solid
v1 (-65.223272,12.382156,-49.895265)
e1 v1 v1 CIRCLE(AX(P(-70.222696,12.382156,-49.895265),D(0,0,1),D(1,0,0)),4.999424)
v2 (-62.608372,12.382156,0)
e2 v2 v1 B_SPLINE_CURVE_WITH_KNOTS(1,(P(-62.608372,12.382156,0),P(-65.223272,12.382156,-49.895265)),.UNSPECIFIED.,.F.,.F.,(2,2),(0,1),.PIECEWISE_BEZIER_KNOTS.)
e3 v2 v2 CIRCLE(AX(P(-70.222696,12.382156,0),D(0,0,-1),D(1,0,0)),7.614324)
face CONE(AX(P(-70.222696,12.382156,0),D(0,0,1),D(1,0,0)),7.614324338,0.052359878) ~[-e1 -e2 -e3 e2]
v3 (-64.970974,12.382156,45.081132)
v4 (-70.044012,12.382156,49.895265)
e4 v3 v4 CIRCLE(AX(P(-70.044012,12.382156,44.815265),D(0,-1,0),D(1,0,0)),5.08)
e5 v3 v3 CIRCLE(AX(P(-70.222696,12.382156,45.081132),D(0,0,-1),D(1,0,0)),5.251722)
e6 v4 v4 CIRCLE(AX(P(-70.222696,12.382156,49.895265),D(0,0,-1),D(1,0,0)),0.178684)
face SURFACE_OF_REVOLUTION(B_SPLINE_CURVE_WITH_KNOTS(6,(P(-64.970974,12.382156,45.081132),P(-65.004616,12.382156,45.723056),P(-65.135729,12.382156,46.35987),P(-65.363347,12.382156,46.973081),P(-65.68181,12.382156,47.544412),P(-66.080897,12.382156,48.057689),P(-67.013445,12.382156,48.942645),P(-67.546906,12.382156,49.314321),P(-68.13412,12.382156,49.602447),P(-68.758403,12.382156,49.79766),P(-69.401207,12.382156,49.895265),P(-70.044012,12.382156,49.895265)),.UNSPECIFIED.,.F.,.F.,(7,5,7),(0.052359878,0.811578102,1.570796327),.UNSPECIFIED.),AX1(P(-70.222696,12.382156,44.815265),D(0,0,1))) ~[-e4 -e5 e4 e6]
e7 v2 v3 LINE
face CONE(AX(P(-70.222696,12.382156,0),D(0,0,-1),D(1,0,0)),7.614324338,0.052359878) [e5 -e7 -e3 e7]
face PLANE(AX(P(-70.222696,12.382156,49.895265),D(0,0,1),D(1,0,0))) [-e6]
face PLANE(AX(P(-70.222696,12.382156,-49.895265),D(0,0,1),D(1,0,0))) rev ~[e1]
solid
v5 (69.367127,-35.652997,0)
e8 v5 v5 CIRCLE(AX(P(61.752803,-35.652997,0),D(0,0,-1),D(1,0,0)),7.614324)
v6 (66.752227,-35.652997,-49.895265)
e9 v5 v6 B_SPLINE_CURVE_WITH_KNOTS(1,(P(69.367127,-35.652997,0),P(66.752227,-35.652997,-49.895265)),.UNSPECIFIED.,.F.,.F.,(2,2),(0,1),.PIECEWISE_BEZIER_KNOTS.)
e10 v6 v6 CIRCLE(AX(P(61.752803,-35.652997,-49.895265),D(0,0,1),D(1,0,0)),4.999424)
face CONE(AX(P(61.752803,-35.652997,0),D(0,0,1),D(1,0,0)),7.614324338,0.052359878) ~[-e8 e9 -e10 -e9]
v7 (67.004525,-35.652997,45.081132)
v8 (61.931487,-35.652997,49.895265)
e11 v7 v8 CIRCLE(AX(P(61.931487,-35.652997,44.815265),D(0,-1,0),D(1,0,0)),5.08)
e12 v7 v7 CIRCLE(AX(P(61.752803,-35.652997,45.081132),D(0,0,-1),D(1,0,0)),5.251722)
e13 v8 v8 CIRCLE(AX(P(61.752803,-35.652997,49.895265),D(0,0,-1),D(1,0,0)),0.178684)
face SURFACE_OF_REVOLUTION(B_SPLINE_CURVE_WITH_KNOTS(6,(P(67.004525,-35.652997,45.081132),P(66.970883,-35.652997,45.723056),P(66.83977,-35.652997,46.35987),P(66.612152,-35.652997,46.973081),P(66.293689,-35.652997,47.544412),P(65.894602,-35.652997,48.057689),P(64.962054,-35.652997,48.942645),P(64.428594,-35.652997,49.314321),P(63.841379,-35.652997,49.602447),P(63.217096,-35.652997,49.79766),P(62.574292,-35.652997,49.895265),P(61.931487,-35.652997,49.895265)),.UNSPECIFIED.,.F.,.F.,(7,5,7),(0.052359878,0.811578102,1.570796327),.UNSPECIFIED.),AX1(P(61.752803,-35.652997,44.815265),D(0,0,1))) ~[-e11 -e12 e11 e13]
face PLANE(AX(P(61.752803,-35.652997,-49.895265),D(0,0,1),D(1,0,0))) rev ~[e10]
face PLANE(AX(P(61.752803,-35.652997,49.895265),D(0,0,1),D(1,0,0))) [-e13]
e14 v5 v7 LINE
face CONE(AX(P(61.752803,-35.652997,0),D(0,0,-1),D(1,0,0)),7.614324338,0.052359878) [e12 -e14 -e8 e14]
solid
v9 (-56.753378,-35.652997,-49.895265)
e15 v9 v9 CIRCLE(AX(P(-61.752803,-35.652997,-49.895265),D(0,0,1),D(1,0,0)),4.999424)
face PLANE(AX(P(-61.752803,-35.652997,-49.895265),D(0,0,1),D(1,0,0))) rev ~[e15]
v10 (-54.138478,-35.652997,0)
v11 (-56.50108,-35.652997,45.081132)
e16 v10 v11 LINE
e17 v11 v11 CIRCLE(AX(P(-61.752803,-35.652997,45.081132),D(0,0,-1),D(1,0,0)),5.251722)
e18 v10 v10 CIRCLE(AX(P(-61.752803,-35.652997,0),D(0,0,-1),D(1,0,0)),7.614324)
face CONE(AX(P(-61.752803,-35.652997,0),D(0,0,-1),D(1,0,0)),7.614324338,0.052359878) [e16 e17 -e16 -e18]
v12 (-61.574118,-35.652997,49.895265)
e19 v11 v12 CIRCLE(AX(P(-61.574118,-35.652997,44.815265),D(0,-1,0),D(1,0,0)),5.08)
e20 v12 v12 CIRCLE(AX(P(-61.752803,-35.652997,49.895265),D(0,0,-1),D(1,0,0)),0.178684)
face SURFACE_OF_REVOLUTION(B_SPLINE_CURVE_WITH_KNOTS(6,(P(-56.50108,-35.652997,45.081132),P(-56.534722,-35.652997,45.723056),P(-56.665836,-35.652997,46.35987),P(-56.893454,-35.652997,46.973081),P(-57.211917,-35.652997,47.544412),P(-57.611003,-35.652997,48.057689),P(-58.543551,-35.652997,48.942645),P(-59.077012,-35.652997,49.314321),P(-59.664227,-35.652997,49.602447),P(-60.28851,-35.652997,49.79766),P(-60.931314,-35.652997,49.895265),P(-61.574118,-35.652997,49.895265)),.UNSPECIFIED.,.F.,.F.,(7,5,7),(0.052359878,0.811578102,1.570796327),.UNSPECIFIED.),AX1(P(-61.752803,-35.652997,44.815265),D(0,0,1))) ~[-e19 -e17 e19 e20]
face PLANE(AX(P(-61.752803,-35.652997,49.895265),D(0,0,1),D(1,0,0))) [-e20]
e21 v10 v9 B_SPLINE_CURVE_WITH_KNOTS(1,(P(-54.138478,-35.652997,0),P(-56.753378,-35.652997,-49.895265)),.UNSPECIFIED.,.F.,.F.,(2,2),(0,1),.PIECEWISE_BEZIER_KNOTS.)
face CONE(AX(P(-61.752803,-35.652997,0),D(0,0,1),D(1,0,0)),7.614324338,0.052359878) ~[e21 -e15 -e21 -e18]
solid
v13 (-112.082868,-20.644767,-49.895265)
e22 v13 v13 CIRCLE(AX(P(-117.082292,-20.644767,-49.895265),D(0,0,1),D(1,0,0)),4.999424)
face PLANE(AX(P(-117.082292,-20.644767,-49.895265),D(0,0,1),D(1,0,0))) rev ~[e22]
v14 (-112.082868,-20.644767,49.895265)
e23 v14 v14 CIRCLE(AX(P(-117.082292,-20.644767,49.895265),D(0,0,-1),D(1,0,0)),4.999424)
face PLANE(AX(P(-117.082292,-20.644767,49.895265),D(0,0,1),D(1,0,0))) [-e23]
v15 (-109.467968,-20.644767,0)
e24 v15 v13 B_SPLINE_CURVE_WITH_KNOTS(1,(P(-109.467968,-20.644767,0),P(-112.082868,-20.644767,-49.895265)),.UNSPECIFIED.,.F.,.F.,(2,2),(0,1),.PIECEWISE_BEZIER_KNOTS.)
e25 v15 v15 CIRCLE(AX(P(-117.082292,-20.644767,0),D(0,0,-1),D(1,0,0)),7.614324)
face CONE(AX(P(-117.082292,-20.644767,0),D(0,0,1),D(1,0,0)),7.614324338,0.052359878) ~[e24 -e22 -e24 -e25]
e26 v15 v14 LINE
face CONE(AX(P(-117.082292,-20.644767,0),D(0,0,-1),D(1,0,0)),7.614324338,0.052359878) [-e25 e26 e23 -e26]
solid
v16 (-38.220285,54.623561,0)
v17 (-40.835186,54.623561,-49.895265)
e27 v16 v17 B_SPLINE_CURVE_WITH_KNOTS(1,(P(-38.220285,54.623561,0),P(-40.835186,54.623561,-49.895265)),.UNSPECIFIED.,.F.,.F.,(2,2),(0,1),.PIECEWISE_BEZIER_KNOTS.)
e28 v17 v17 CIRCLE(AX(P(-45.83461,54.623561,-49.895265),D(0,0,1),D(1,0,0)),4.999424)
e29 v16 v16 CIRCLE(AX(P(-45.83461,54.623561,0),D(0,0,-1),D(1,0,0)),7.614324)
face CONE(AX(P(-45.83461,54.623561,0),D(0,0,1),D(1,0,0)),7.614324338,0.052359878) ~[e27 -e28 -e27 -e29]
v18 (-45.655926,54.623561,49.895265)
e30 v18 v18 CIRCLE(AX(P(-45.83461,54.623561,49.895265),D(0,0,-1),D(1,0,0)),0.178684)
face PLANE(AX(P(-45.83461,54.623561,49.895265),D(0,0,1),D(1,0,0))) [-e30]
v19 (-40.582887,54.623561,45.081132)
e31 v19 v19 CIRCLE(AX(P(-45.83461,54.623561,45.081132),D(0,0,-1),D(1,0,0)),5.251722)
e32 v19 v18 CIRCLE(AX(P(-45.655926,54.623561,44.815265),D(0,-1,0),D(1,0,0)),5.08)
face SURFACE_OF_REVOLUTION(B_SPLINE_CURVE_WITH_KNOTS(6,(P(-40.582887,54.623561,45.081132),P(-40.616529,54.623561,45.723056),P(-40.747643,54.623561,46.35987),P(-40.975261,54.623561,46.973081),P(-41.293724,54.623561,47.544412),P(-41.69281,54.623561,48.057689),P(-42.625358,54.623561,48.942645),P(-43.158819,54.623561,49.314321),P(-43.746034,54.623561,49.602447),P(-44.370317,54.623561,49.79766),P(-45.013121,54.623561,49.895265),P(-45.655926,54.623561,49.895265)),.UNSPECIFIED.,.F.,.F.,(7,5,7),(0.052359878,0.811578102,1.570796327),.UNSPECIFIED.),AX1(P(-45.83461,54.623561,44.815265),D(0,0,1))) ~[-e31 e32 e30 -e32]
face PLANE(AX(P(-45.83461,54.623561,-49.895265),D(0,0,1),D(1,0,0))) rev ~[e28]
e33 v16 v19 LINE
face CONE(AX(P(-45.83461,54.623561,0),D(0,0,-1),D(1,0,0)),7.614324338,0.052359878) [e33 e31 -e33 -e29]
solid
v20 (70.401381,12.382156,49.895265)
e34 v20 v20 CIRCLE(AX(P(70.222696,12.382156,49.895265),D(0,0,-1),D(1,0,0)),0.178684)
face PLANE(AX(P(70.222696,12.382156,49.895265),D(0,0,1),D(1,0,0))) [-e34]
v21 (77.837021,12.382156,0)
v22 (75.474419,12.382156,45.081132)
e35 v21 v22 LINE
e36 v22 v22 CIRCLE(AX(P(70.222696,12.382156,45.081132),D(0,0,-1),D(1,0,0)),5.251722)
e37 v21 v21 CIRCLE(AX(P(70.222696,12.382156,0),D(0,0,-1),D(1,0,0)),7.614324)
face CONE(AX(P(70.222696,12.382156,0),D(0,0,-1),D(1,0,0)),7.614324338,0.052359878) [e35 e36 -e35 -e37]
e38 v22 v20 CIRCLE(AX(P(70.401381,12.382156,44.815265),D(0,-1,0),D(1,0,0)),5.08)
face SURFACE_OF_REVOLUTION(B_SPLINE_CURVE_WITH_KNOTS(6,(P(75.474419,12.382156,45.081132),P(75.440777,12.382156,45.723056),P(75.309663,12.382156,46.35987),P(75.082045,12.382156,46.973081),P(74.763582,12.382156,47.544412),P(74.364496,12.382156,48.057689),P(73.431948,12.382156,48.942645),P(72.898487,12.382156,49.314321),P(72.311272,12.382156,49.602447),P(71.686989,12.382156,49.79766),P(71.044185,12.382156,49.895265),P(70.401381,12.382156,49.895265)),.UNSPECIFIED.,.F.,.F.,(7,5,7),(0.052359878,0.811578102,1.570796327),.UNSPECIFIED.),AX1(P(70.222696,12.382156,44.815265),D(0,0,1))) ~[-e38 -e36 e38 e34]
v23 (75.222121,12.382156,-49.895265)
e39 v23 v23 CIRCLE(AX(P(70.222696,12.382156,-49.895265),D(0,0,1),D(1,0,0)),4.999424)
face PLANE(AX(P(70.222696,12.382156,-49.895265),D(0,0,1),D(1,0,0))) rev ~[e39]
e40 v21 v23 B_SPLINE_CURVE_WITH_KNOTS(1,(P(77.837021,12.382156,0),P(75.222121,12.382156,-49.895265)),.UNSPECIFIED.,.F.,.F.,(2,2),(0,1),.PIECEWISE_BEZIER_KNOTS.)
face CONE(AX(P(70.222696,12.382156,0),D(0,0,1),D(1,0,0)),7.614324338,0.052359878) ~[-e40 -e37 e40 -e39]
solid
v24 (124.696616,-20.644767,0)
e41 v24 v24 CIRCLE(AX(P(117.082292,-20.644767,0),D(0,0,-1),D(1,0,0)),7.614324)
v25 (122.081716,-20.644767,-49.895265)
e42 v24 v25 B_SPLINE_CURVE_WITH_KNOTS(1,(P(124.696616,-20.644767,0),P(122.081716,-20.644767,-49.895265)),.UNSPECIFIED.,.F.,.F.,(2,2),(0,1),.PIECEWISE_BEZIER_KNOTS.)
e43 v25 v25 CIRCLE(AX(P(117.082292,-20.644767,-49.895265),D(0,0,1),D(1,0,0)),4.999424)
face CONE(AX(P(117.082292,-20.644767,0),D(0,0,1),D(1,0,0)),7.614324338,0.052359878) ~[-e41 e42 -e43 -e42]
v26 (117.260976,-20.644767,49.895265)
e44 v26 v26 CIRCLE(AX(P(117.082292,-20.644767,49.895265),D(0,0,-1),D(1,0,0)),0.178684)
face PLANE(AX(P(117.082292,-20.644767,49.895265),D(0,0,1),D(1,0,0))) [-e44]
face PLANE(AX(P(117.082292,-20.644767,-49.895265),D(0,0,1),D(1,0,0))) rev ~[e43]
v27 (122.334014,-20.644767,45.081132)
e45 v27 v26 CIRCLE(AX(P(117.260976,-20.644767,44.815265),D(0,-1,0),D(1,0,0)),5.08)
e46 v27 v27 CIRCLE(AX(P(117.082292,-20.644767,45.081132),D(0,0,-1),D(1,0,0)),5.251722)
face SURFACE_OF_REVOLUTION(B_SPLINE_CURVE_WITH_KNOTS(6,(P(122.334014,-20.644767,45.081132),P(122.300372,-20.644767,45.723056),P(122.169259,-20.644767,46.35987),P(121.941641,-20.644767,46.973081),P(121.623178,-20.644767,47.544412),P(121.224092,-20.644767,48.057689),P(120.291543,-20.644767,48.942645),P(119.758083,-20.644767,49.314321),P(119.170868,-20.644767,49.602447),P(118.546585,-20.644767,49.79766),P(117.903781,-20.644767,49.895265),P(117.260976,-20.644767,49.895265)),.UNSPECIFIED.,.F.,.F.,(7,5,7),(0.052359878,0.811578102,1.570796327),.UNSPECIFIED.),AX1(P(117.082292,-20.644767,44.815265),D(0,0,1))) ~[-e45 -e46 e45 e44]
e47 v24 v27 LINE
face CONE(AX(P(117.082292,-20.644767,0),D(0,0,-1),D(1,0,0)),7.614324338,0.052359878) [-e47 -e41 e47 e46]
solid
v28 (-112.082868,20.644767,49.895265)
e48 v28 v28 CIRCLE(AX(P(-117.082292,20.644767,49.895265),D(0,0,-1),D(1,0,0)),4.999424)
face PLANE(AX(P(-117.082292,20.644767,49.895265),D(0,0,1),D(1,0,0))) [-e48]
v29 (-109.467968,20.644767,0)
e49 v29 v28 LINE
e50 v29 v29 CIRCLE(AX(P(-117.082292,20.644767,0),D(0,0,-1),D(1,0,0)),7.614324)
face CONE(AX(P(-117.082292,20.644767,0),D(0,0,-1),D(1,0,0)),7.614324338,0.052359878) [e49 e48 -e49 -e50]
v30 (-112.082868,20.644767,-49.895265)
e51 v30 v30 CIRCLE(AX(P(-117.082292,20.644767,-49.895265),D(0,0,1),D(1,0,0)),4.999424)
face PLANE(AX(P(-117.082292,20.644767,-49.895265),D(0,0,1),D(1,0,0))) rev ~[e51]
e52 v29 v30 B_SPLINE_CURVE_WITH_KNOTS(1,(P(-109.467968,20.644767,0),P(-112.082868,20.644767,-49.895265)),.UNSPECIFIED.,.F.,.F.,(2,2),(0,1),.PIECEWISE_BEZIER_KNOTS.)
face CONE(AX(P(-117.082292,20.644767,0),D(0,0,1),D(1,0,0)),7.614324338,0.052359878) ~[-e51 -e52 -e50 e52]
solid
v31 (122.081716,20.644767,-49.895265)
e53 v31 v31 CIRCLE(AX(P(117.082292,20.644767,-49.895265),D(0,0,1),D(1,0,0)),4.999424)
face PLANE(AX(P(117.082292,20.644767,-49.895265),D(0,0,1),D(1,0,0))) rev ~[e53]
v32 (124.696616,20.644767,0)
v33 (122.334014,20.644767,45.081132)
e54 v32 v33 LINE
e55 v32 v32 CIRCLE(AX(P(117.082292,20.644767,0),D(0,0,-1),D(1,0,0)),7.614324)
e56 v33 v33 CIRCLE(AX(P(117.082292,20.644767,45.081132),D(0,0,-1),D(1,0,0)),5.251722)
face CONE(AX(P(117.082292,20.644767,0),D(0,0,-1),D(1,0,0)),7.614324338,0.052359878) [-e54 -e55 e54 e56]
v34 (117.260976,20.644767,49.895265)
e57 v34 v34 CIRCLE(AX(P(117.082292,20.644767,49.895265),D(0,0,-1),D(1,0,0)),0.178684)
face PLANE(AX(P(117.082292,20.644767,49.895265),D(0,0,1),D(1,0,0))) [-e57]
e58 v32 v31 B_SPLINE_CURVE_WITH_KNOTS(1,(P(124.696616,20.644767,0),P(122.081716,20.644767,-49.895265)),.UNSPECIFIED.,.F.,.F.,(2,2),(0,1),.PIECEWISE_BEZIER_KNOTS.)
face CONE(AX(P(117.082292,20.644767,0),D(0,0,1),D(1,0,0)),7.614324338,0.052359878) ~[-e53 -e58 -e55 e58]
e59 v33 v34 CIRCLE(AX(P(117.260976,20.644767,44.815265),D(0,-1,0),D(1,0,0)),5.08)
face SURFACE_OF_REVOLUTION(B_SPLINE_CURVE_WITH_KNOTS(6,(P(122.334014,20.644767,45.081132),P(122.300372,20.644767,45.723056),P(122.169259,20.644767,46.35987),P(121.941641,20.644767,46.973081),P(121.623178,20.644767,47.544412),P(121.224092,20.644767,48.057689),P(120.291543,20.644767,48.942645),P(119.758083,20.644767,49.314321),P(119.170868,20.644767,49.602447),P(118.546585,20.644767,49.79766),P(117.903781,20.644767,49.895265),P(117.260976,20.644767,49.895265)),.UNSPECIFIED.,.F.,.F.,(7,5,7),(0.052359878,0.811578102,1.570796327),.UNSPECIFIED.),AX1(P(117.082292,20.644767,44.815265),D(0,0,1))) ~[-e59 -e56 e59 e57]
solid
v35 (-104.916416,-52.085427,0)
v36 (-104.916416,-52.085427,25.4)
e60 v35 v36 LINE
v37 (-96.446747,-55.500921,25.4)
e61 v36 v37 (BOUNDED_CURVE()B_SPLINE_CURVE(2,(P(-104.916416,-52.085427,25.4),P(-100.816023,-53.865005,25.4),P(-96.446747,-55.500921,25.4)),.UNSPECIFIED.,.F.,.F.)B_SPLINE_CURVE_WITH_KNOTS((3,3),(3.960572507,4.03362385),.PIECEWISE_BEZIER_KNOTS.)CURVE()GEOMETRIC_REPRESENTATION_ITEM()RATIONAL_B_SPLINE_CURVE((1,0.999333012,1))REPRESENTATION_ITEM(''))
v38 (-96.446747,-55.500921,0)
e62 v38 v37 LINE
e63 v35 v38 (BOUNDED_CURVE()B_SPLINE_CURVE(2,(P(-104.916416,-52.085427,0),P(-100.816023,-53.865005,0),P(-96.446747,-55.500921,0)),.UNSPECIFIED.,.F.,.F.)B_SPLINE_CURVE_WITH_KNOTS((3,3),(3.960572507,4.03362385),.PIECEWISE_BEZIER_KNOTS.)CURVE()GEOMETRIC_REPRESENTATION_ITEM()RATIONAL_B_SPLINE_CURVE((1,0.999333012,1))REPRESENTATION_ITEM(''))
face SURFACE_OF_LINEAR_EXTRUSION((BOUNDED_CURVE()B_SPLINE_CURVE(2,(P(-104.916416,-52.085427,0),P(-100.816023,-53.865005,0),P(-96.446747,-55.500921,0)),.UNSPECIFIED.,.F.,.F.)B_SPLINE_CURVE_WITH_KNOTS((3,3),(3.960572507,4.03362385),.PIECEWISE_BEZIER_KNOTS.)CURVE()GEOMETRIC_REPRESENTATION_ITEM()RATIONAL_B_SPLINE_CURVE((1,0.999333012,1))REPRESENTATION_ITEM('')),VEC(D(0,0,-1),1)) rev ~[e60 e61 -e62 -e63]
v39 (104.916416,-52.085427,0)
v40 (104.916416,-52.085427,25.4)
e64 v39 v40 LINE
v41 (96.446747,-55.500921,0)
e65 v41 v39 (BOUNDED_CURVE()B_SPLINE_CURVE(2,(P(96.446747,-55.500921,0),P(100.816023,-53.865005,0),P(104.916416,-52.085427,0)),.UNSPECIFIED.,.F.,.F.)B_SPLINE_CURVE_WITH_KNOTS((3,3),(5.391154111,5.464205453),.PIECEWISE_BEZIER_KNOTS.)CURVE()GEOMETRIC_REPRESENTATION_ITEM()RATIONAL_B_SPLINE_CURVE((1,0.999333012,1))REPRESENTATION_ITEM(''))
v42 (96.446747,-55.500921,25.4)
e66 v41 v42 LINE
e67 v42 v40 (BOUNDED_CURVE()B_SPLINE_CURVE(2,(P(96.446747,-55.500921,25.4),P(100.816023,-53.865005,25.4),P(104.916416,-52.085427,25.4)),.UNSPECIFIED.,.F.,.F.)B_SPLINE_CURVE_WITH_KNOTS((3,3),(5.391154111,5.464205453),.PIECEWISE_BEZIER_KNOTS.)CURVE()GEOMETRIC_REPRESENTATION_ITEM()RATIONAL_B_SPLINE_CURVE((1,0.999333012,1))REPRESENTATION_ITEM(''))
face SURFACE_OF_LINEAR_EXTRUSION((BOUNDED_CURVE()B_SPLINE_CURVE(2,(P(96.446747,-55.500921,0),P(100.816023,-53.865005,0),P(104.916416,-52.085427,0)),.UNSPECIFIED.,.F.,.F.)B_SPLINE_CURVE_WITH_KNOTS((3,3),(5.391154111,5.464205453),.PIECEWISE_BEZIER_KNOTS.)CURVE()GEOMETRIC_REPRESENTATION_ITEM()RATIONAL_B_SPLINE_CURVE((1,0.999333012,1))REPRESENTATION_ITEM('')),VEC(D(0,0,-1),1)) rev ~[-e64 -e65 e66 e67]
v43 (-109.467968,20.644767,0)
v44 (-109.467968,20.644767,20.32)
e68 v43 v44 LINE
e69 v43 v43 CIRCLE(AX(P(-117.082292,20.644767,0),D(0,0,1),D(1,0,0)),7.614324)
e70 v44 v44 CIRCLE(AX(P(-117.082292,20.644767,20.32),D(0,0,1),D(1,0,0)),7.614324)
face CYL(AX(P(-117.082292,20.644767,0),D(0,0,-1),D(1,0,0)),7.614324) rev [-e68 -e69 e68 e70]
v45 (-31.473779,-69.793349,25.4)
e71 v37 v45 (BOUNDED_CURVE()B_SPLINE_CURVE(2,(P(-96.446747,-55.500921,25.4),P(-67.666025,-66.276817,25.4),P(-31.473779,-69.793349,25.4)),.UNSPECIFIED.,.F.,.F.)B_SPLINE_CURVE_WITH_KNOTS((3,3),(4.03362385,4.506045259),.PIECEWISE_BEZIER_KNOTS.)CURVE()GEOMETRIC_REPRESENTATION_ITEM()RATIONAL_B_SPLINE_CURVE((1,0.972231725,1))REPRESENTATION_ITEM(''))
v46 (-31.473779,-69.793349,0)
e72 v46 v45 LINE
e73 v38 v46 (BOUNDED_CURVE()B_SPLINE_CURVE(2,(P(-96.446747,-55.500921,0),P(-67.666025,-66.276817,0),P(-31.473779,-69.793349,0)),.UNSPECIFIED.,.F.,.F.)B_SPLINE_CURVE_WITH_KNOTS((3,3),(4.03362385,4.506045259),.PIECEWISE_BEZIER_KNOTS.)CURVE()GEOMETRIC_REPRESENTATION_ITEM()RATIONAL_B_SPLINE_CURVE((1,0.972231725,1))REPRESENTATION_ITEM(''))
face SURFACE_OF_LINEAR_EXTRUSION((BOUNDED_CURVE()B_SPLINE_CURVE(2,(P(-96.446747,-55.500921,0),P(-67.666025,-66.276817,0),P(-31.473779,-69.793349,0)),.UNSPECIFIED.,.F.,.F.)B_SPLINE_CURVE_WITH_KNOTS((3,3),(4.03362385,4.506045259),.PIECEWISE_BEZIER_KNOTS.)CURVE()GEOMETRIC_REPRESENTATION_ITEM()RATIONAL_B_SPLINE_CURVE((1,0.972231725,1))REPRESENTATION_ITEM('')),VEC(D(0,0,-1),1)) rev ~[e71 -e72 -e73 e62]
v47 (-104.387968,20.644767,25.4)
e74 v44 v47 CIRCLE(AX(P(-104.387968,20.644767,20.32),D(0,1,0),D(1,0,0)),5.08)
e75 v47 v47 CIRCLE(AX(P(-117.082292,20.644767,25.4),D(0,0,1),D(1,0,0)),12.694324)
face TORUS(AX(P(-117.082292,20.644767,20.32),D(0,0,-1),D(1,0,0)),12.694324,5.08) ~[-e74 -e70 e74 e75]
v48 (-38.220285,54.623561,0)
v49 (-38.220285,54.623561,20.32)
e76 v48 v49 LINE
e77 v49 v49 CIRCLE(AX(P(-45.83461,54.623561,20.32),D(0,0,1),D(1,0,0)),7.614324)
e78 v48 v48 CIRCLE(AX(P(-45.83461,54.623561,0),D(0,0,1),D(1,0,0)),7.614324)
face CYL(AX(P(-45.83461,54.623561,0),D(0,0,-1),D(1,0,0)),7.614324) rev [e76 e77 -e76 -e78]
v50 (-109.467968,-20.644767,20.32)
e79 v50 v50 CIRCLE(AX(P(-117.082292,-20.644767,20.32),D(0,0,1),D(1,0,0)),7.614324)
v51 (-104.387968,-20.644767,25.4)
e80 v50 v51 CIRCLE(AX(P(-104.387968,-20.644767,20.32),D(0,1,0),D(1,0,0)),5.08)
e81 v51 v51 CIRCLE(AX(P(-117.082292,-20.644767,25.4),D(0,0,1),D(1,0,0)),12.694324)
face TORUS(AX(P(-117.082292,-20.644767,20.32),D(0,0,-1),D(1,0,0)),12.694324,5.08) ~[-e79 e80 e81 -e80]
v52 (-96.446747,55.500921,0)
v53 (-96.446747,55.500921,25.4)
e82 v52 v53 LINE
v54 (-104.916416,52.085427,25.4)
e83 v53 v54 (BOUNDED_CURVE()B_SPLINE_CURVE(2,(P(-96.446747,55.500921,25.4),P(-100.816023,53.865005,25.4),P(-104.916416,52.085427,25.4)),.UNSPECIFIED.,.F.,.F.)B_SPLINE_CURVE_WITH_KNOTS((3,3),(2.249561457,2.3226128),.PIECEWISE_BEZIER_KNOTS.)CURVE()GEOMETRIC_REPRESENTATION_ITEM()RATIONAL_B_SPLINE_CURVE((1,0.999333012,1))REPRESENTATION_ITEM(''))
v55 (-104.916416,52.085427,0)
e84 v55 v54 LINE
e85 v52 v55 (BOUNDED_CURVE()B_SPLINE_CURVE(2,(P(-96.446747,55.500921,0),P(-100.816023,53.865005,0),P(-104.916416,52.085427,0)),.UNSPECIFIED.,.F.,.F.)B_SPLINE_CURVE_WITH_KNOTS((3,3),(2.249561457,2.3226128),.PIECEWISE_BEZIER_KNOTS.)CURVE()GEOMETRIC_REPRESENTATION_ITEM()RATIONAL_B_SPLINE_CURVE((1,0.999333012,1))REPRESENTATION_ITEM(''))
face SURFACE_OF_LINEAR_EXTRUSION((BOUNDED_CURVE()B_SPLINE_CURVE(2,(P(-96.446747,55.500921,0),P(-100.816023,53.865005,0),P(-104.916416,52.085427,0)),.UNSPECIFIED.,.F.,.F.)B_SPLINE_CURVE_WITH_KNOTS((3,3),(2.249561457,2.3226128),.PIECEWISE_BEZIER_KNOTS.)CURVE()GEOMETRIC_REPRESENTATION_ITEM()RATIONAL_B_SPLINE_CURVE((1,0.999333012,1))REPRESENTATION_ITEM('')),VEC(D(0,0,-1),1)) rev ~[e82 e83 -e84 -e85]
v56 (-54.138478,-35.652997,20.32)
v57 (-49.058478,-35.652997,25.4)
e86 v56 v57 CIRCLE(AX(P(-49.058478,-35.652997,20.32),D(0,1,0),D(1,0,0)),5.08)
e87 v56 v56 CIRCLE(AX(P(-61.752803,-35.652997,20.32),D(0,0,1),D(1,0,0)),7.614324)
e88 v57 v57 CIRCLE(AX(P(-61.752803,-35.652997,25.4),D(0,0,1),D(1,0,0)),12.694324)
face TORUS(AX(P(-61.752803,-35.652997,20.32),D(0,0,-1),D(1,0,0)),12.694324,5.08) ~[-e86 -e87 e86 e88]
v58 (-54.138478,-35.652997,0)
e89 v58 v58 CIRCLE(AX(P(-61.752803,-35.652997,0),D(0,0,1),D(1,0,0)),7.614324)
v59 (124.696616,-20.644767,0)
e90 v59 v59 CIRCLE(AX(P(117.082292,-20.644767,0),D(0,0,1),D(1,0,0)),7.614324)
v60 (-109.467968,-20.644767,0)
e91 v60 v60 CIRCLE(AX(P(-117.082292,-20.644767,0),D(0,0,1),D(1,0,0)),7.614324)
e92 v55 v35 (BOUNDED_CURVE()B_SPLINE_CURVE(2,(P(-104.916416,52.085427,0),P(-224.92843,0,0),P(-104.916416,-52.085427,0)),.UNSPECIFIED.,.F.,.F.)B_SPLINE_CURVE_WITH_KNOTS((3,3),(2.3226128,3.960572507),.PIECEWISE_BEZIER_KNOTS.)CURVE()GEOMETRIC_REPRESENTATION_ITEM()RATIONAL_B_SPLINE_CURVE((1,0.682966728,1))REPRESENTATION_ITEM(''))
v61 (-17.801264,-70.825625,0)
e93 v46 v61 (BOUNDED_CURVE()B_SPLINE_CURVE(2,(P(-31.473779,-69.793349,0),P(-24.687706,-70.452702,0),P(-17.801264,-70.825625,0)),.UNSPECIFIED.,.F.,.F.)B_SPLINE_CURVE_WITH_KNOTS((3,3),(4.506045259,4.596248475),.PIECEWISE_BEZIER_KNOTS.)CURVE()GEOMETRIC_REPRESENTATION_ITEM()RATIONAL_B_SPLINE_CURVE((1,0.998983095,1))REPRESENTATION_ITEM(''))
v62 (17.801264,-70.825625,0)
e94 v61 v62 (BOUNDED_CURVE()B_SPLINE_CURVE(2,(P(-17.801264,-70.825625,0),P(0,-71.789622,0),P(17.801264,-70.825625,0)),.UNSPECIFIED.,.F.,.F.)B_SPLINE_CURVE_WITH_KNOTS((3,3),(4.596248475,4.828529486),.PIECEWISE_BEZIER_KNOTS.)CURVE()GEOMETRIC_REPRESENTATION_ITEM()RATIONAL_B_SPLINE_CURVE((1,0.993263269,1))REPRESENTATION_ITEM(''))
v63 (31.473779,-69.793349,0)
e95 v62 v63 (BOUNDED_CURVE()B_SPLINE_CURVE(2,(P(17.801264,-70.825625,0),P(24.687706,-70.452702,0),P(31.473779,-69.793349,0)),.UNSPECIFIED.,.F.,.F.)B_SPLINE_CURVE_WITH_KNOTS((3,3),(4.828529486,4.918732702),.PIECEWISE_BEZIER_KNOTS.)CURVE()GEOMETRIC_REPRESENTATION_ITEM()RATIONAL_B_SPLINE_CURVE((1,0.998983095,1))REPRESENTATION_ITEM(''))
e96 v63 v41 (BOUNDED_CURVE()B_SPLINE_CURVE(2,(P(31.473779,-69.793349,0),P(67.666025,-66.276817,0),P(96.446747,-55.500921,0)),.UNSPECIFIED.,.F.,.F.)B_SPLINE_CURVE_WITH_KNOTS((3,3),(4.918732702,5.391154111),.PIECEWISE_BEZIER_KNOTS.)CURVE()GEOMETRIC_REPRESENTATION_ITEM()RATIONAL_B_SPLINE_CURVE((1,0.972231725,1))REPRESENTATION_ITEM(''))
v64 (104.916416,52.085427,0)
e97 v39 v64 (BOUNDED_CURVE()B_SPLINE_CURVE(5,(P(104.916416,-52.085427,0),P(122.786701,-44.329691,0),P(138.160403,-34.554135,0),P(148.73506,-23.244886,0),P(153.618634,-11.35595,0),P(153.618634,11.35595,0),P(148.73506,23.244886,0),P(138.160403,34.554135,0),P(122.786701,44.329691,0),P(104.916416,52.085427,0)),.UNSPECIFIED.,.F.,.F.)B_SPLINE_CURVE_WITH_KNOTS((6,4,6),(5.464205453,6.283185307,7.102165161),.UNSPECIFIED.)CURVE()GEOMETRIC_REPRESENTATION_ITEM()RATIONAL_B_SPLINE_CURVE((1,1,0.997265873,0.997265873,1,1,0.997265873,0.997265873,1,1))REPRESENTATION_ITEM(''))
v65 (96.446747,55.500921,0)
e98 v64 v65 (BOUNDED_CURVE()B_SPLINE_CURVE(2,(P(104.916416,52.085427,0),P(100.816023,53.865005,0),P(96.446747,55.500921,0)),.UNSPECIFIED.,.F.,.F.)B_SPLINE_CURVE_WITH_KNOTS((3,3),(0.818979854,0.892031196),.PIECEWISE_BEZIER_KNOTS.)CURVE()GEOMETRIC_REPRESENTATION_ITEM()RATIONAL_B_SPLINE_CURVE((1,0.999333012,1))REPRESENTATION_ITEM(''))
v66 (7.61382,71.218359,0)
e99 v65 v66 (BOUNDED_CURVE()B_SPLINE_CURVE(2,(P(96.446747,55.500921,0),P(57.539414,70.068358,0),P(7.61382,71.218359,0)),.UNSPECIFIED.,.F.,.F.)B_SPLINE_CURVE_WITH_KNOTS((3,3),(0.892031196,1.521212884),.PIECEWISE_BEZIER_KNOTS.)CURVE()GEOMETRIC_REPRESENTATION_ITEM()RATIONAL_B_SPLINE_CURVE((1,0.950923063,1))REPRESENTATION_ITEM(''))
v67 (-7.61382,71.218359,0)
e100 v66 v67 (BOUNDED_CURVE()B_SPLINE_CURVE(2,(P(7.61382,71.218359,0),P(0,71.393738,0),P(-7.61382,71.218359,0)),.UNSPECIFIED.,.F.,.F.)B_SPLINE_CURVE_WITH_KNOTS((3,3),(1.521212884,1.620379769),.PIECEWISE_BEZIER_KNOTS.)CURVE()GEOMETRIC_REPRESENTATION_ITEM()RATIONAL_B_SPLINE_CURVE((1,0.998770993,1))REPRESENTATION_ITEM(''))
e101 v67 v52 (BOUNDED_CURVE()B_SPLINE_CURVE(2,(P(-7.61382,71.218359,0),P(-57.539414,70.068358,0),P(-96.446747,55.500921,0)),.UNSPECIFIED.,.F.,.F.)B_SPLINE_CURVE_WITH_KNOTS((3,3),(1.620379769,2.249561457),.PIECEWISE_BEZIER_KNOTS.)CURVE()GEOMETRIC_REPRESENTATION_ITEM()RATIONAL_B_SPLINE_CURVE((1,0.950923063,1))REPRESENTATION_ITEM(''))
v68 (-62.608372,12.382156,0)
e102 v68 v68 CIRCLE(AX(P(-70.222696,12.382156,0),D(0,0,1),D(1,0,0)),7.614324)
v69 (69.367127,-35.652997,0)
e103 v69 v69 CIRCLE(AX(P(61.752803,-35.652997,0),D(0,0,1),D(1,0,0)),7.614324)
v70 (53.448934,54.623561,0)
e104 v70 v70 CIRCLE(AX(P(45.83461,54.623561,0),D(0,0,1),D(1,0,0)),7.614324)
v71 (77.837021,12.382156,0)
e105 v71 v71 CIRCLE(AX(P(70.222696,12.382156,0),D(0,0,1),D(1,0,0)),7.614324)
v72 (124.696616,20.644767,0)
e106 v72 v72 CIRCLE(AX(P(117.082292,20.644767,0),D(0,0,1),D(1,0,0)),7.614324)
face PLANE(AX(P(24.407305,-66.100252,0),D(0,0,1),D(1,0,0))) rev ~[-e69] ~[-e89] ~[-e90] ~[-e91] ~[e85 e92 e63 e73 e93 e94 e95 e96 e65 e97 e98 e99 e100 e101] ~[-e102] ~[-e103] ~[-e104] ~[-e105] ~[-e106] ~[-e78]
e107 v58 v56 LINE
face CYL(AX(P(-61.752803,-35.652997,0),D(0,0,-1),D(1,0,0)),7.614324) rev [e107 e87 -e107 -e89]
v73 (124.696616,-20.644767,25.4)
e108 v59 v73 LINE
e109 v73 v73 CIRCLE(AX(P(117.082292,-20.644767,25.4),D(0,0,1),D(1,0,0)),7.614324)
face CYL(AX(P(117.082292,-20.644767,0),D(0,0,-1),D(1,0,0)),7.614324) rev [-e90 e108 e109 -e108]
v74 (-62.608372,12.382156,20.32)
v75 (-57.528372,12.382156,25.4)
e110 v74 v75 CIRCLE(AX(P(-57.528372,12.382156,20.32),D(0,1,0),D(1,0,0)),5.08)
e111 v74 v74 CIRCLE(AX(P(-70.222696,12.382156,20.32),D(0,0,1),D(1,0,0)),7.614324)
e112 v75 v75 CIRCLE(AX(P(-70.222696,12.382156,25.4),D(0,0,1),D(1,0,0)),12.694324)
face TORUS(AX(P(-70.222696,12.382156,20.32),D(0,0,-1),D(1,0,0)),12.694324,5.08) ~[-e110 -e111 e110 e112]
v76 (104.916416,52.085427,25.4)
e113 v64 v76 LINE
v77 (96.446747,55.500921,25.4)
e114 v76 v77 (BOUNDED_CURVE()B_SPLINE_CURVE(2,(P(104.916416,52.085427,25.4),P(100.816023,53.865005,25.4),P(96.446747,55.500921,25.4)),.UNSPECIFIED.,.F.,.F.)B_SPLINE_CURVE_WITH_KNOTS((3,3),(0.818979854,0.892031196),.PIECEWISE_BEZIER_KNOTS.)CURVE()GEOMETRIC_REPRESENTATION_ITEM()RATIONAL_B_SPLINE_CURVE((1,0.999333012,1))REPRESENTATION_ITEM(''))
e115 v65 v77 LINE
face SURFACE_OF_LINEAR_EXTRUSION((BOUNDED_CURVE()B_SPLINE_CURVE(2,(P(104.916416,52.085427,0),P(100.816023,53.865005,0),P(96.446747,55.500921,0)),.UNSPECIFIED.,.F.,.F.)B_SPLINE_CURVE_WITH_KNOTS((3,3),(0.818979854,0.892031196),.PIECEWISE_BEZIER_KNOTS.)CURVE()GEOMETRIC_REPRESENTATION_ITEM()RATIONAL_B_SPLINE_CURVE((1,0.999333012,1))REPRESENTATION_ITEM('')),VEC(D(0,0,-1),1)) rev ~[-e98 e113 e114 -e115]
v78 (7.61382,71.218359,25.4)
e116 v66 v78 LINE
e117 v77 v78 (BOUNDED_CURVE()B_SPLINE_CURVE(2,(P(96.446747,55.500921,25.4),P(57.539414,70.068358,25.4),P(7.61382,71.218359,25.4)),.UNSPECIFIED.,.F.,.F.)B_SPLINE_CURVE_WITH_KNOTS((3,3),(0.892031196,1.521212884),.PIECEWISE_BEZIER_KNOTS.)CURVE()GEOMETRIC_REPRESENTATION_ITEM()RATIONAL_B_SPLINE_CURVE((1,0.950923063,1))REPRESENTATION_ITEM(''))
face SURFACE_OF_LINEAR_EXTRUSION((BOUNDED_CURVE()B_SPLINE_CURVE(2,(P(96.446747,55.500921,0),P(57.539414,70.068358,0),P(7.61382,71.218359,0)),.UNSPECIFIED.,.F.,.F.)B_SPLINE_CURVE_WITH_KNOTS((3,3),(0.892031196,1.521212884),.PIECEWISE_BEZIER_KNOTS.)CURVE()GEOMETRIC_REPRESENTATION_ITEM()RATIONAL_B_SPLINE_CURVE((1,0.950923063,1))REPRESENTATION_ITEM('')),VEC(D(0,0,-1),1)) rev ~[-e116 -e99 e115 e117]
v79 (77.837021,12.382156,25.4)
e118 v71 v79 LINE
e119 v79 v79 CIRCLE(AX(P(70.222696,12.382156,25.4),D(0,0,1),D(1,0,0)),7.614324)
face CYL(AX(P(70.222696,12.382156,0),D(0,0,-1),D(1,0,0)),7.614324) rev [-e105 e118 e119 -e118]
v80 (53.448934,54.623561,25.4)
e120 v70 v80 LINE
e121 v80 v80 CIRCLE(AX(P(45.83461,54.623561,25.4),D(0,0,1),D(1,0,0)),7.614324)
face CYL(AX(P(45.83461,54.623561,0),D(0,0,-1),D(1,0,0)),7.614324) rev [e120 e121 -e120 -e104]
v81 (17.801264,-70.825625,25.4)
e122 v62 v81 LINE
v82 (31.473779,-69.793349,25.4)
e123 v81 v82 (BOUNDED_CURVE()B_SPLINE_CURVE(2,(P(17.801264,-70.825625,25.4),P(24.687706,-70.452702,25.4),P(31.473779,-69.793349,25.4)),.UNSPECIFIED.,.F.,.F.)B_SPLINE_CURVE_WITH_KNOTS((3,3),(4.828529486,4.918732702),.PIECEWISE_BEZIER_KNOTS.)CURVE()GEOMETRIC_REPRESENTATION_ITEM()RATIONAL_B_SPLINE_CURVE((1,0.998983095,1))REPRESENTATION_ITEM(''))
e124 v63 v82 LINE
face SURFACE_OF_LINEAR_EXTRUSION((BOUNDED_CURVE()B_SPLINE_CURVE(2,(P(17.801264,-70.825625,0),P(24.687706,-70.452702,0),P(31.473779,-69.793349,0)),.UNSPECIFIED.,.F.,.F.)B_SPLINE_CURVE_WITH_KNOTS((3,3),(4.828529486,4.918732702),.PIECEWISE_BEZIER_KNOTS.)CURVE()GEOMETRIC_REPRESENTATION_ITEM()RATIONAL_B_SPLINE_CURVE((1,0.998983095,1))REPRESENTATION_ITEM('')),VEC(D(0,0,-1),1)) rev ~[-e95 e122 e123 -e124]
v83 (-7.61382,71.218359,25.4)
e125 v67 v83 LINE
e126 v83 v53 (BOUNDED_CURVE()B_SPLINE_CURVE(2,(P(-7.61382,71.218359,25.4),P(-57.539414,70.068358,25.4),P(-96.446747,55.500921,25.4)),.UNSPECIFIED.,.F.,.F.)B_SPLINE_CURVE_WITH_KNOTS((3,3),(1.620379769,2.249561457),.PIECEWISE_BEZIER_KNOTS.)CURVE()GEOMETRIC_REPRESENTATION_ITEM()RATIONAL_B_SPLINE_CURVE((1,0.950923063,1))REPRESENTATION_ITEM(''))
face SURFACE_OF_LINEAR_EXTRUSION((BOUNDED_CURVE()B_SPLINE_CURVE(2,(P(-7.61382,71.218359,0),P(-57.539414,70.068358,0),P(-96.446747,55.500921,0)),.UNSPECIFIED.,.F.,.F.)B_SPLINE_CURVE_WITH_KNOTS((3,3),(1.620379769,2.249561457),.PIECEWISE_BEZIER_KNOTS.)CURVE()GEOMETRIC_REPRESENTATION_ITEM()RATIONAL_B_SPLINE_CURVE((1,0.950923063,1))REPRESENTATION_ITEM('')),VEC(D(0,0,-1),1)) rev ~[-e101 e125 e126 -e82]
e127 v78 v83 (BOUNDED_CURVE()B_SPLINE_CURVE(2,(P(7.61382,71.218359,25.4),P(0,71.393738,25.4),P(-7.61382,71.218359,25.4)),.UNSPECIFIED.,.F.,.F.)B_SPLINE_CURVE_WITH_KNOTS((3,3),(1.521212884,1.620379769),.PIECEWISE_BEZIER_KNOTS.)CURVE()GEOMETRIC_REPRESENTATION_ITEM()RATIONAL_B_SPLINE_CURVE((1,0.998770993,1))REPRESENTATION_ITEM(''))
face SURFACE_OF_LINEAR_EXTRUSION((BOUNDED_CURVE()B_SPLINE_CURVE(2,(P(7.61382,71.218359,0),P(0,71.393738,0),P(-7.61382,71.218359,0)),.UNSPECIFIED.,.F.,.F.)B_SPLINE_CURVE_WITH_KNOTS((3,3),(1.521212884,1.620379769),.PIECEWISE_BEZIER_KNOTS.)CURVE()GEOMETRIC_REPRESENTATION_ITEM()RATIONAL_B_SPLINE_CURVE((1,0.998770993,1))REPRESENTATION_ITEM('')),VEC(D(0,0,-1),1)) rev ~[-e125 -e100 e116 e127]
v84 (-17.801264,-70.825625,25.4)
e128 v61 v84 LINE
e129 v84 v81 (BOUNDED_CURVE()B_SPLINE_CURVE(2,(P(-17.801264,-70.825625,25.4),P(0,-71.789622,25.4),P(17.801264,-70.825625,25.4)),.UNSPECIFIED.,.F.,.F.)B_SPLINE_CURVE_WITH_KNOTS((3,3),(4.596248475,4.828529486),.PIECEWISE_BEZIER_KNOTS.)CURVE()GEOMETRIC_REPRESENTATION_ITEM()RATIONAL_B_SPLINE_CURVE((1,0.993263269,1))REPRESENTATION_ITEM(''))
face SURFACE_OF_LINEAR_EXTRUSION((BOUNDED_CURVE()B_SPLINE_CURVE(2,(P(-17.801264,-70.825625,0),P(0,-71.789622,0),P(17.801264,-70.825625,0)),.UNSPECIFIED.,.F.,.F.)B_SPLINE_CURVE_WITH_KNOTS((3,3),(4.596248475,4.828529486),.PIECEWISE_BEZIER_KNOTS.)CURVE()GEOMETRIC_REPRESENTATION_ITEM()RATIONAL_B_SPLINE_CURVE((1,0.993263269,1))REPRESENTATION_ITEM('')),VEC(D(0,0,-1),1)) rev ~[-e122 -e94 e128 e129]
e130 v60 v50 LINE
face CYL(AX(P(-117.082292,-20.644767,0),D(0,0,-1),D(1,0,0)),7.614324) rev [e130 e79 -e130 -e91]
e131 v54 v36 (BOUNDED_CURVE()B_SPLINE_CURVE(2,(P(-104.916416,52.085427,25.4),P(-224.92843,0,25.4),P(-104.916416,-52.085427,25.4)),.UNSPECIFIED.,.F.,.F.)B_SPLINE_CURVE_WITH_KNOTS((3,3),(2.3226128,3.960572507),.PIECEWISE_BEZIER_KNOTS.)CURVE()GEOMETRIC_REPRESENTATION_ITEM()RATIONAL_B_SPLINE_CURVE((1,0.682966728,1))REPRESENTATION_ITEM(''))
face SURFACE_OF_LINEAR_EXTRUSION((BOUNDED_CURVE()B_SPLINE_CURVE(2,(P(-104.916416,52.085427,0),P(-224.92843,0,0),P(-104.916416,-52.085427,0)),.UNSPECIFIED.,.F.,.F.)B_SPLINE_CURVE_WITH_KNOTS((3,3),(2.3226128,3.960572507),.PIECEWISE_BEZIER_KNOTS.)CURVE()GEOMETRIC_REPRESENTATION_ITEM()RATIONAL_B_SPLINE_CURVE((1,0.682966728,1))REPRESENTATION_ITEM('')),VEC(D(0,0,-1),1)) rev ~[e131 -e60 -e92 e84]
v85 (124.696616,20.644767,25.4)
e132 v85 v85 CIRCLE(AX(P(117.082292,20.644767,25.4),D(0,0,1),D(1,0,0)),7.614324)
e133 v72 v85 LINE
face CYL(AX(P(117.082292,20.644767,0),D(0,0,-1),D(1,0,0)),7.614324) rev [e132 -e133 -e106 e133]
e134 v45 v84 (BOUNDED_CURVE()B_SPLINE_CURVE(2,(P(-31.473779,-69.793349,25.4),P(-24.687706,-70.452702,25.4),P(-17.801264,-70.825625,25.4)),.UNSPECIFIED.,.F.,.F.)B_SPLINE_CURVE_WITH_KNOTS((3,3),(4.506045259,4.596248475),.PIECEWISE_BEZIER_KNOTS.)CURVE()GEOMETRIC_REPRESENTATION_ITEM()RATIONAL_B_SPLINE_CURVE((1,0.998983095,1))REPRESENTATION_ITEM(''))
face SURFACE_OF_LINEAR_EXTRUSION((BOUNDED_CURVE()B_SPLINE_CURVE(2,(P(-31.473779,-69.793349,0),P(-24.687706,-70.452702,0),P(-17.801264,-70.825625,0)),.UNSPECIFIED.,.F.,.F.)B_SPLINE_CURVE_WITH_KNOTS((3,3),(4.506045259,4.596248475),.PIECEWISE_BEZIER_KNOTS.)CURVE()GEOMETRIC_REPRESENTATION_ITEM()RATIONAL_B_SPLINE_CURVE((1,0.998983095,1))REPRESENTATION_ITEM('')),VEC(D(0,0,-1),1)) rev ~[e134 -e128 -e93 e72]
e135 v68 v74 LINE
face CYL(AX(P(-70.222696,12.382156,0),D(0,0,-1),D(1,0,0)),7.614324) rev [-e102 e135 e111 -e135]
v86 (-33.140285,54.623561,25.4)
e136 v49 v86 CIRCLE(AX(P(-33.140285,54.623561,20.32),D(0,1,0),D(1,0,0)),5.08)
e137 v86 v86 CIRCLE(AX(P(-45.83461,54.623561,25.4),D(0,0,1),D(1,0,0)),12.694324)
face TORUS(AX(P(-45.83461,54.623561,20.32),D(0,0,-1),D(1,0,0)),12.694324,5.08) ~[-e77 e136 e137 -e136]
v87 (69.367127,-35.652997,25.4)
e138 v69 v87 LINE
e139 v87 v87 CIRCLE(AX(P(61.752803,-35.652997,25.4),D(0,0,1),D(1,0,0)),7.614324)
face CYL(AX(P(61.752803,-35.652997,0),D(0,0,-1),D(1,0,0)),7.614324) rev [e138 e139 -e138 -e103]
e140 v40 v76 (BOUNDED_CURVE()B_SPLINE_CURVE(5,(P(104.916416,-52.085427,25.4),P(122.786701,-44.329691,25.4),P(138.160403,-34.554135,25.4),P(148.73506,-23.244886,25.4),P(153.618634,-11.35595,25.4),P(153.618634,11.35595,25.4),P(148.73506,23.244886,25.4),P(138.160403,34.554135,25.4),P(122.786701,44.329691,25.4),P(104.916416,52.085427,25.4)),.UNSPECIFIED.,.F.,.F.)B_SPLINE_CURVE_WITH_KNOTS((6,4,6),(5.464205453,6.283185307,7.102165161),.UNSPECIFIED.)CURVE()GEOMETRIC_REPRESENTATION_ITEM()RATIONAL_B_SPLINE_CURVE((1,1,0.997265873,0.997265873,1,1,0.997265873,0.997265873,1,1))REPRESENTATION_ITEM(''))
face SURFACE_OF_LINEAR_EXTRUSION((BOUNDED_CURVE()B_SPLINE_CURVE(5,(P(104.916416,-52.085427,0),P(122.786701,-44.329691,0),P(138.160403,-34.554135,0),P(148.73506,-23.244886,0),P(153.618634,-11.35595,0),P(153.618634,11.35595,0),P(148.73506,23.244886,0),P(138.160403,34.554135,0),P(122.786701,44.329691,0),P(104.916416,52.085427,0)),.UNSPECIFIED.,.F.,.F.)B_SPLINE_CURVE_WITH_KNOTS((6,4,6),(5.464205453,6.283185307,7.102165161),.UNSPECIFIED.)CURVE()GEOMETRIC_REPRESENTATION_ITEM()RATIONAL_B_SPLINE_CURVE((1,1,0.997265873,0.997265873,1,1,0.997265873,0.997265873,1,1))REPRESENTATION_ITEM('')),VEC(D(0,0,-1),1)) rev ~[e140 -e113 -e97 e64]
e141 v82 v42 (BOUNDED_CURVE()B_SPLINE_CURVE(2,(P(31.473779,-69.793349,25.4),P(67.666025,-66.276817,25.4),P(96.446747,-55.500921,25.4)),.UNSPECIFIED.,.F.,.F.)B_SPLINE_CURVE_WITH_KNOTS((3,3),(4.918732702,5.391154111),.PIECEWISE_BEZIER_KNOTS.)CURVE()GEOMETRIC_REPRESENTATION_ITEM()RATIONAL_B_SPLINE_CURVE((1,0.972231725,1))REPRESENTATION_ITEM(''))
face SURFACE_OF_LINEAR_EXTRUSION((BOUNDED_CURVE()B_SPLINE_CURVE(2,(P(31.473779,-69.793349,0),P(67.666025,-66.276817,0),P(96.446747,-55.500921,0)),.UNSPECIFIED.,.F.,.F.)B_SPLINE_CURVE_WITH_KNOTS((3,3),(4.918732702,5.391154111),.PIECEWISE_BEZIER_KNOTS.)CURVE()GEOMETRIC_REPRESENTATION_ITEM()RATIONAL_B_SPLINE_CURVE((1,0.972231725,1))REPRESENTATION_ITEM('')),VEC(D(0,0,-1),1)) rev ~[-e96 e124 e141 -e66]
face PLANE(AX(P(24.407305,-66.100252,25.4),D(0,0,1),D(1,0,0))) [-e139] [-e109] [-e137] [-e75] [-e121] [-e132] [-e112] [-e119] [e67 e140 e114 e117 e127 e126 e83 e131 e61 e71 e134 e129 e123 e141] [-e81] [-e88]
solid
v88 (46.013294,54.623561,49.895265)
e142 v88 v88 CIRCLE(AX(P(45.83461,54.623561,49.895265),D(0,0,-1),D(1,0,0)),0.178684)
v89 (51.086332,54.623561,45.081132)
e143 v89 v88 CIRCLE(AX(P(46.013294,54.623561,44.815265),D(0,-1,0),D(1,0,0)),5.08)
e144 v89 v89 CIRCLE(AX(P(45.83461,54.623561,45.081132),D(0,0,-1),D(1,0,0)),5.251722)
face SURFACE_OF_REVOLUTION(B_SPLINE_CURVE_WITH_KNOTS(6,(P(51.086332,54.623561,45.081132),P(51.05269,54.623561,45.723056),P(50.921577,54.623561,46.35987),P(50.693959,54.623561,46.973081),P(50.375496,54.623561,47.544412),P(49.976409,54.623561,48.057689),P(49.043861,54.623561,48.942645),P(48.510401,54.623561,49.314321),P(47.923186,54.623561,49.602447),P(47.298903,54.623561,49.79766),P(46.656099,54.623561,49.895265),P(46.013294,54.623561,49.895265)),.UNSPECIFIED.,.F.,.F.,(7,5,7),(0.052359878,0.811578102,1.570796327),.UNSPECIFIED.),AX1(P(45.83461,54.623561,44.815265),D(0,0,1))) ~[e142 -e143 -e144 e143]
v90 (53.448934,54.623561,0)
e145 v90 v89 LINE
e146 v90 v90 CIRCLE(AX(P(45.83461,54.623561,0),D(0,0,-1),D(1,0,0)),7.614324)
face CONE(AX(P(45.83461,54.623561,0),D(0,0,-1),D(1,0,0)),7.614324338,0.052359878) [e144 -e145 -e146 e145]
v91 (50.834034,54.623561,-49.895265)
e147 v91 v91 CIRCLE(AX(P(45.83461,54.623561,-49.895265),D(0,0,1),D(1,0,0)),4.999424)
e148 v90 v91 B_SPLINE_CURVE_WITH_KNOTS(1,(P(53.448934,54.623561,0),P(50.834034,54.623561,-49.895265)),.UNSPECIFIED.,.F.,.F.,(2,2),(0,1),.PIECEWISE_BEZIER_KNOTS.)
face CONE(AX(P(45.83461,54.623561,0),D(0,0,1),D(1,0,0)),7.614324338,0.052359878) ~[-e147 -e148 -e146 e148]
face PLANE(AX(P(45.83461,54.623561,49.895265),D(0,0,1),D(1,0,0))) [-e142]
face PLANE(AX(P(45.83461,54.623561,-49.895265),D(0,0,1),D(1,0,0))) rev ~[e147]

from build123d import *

# Parameters (mm, degrees)
F0_R     = 7.6143243375
F1_DEPTH = 25.4
F2_DEPTH = 49.8952651396
F2_TAPER = 3
F3_R     = 5.08
F3_2_R   = 5.08
F3_3_R   = 5.08
F3_4_R   = 5.08
F3_5_R   = 5.08
F3_6_R   = 5.08
F3_7_R   = 5.08
F3_8_R   = 5.08
F3_9_R   = 5.08


with BuildPart() as f1:
    # F0 (on Top) → F1 (new body)
    with BuildSketch(Plane.XY):
        with BuildLine():
            add(Edge.make_bspline(
                [(17.801263636, -70.8256252835), (24.6877059738, -70.4527018988), (31.4737791508, -69.7933493669)],
                knots=[4.8285294859, 4.8285294859, 4.8285294859, 4.9187327022, 4.9187327022, 4.9187327022], degree=2, weights=[1, 0.9989830949, 1]))
            ThreePointArc((31.4737791508, -69.7933493669), (31.8690856595, -68.424373517), (32.0024108255, -67.0057169295))
            ThreePointArc((32.0024108255, -67.0057169295), (22.41024302, -59.6527535587), (17.801263636, -70.8256252835))
        make_face()
        with BuildLine():
            add(Edge.make_bspline(
                [(-31.4737791508, -69.7933493669), (-24.6877059738, -70.4527018988), (-17.801263636, -70.8256252835)],
                knots=[4.5060452586, 4.5060452586, 4.5060452586, 4.5962484749, 4.5962484749, 4.5962484749], degree=2, weights=[1, 0.9989830949, 1]))
            ThreePointArc((-17.801263636, -70.8256252835), (-17.0351231172, -68.9835603975), (-16.7737621505, -67.0057169295))
            ThreePointArc((-16.7737621505, -67.0057169295), (-25.8067430755, -59.524717758), (-31.4737791508, -69.7933493669))
        make_face()
        with BuildLine():
            ThreePointArc((-7.6138200086, 71.2183590146), (0, 63.6916702477), (7.6138200086, 71.2183590146))
            add(Edge.make_bspline(
                [(7.6138200086, 71.2183590146), (0, 71.3937379931), (-7.6138200086, 71.2183590146)],
                knots=[1.5212128843, 1.5212128843, 1.5212128843, 1.6203797693, 1.6203797693, 1.6203797693], degree=2, weights=[1, 0.9987709929, 1]))
        make_face()
        with BuildLine():
            ThreePointArc((96.4467468907, 55.5009212788), (100.1127044041, 52.3824856248), (104.9164156319, 52.0854269475))
            add(Edge.make_bspline(
                [(104.9164156319, 52.0854269475), (100.816022601, 53.8650047926), (96.4467468907, 55.5009212788)],
                knots=[0.8189798537, 0.8189798537, 0.8189798537, 0.8920311964, 0.8920311964, 0.8920311964], degree=2, weights=[1, 0.9993330118, 1]))
        make_face()
        with BuildLine():
            ThreePointArc((-104.9164156319, 52.0854269475), (-100.1127044041, 52.3824856248), (-96.4467468907, 55.5009212788))
            add(Edge.make_bspline(
                [(-96.4467468907, 55.5009212788), (-100.816022601, 53.8650047926), (-104.9164156319, 52.0854269475)],
                knots=[2.2495614571, 2.2495614571, 2.2495614571, 2.3226127999, 2.3226127999, 2.3226127999], degree=2, weights=[1, 0.9993330118, 1]))
        make_face()
        with BuildLine():
            ThreePointArc((-96.4467468907, -55.5009212788), (-100.1127044041, -52.3824856248), (-104.9164156319, -52.0854269475))
            add(Edge.make_bspline(
                [(-104.9164156319, -52.0854269475), (-100.816022601, -53.8650047926), (-96.4467468907, -55.5009212788)],
                knots=[3.9605725073, 3.9605725073, 3.9605725073, 4.03362385, 4.03362385, 4.03362385], degree=2, weights=[1, 0.9993330118, 1]))
        make_face()
        with BuildLine():
            add(Edge.make_bspline(
                [(96.4467468907, -55.5009212788), (100.816022601, -53.8650047926), (104.9164156319, -52.0854269475)],
                knots=[5.3911541107, 5.3911541107, 5.3911541107, 5.4642054535, 5.4642054535, 5.4642054535], degree=2, weights=[1, 0.9993330118, 1]))
            ThreePointArc((104.9164156319, -52.0854269475), (100.1127044041, -52.3824856248), (96.4467468907, -55.5009212788))
        make_face()
        with BuildLine():
            add(Edge.make_bspline(
                [(104.9164156319, -52.0854269475), (153.6186337471, -30.9485779395), (153.6186337471, 0)],
                knots=[5.4642054535, 5.4642054535, 5.4642054535, 6.2831853072, 6.2831853072, 6.2831853072], degree=2, weights=[1, 0.9173240234, 1]))
            add(Edge.make_bspline(
                [(153.6186337471, 0), (153.6186337471, 30.9485779395), (104.9164156319, 52.0854269475)],
                knots=[0, 0, 0, 0.8189798537, 0.8189798537, 0.8189798537], degree=2, weights=[1, 0.9173240234, 1]))
            ThreePointArc((104.9164156319, 52.0854269475), (100.1127044041, 52.3824856248), (96.4467468907, 55.5009212788))
            add(Edge.make_bspline(
                [(96.4467468907, 55.5009212788), (57.5394135281, 70.0683581499), (7.6138200086, 71.2183590146)],
                knots=[0.8920311964, 0.8920311964, 0.8920311964, 1.5212128843, 1.5212128843, 1.5212128843], degree=2, weights=[1, 0.9509230626, 1]))
            ThreePointArc((7.6138200086, 71.2183590146), (0, 63.6916702477), (-7.6138200086, 71.2183590146))
            add(Edge.make_bspline(
                [(-7.6138200086, 71.2183590146), (-57.5394135281, 70.0683581499), (-96.4467468907, 55.5009212788)],
                knots=[1.6203797693, 1.6203797693, 1.6203797693, 2.2495614571, 2.2495614571, 2.2495614571], degree=2, weights=[1, 0.9509230626, 1]))
            ThreePointArc((-96.4467468907, 55.5009212788), (-100.1127044041, 52.3824856248), (-104.9164156319, 52.0854269475))
            add(Edge.make_bspline(
                [(-104.9164156319, 52.0854269475), (-224.9284298572, 0), (-104.9164156319, -52.0854269475)],
                knots=[2.3226127999, 2.3226127999, 2.3226127999, 3.9605725073, 3.9605725073, 3.9605725073], degree=2, weights=[1, 0.6829667279, 1]))
            ThreePointArc((-104.9164156319, -52.0854269475), (-100.1127044041, -52.3824856248), (-96.4467468907, -55.5009212788))
            add(Edge.make_bspline(
                [(-96.4467468907, -55.5009212788), (-67.6660249215, -66.2768165704), (-31.4737791508, -69.7933493669)],
                knots=[4.03362385, 4.03362385, 4.03362385, 4.5060452586, 4.5060452586, 4.5060452586], degree=2, weights=[1, 0.9722317246, 1]))
            ThreePointArc((-31.4737791508, -69.7933493669), (-25.8067430755, -59.524717758), (-16.7737621505, -67.0057169295))
            ThreePointArc((-16.7737621505, -67.0057169295), (-17.0351231172, -68.9835603975), (-17.801263636, -70.8256252835))
            add(Edge.make_bspline(
                [(-17.801263636, -70.8256252835), (0, -71.7896219543), (17.801263636, -70.8256252835)],
                knots=[4.5962484749, 4.5962484749, 4.5962484749, 4.8285294859, 4.8285294859, 4.8285294859], degree=2, weights=[1, 0.993263269, 1]))
            ThreePointArc((17.801263636, -70.8256252835), (22.41024302, -59.6527535587), (32.0024108255, -67.0057169295))
            ThreePointArc((32.0024108255, -67.0057169295), (31.8690856595, -68.424373517), (31.4737791508, -69.7933493669))
            add(Edge.make_bspline(
                [(31.4737791508, -69.7933493669), (67.6660249215, -66.2768165704), (96.4467468907, -55.5009212788)],
                knots=[4.9187327022, 4.9187327022, 4.9187327022, 5.3911541107, 5.3911541107, 5.3911541107], degree=2, weights=[1, 0.9722317246, 1]))
            ThreePointArc((96.4467468907, -55.5009212788), (100.1127044041, -52.3824856248), (104.9164156319, -52.0854269475))
        make_face()
        with Locations((-117.0822919246, -20.6447670295)):
            Circle(F0_R, mode=Mode.SUBTRACT)
        with Locations((-61.7528027529, -35.6529972926)):
            Circle(F0_R, mode=Mode.SUBTRACT)
        with Locations((61.7528027529, -35.6529972926)):
            Circle(F0_R, mode=Mode.SUBTRACT)
        with Locations((117.0822919246, -20.6447670295)):
            Circle(F0_R, mode=Mode.SUBTRACT)
        with Locations((-117.0822919246, 20.6447670295)):
            Circle(F0_R, mode=Mode.SUBTRACT)
        with Locations((-70.2226963037, 12.3821560164)):
            Circle(F0_R, mode=Mode.SUBTRACT)
        with Locations((-45.8346098157, 54.6235609131)):
            Circle(F0_R, mode=Mode.SUBTRACT)
        with Locations((70.2226963037, 12.3821560164)):
            Circle(F0_R, mode=Mode.SUBTRACT)
        with Locations((45.8346098157, 54.6235609131)):
            Circle(F0_R, mode=Mode.SUBTRACT)
        with Locations((117.0822919246, 20.6447670295)):
            Circle(F0_R, mode=Mode.SUBTRACT)
    extrude(amount=F1_DEPTH)

    # F3
    f3_edges = [f1.edges().sort_by_distance(p)[0] for p in [
        (-124.696616, 20.644767, 25.4),
        (-124.696616, -20.644767, 25.4),
        (-69.367127, -35.652997, 25.4),
        (-77.837021, 12.382156, 25.4),
        (-53.448934, 54.623561, 25.4),
    ]]
    fillet(f3_edges, radius=F3_R)


with BuildPart() as f2:
    # F0 (on Top) → F2 (new body, symmetric)
    with BuildSketch(Plane.XY):
        with Locations((-117.0822919246, 20.6447670295)):
            Circle(F0_R)
    extrude(amount=F2_DEPTH, both=True, taper=F2_TAPER)


with BuildPart() as f2b:
    # F0 (on Top) → F2, piece 2 (new body, symmetric)
    with BuildSketch(Plane.XY):
        with Locations((-117.0822919246, -20.6447670295)):
            Circle(F0_R)
    extrude(amount=F2_DEPTH, both=True, taper=F2_TAPER)


with BuildPart() as f2c:
    # F0 (on Top) → F2, piece 3 (new body, symmetric)
    with BuildSketch(Plane.XY):
        with Locations((-61.7528027529, -35.6529972926)):
            Circle(F0_R)
    extrude(amount=F2_DEPTH, both=True, taper=F2_TAPER)

    # F3#2
    f3_2_edges = [f2c.edges().sort_by_distance(p)[0] for p in [
        (-66.752227, -35.652997, 49.895265),
    ]]
    fillet(f3_2_edges, radius=F3_2_R)


with BuildPart() as f2d:
    # F0 (on Top) → F2, piece 4 (new body, symmetric)
    with BuildSketch(Plane.XY):
        with Locations((-70.2226963037, 12.3821560164)):
            Circle(F0_R)
    extrude(amount=F2_DEPTH, both=True, taper=F2_TAPER)

    # F3#3
    f3_3_edges = [f2d.edges().sort_by_distance(p)[0] for p in [
        (-75.222121, 12.382156, 49.895265),
    ]]
    fillet(f3_3_edges, radius=F3_3_R)


with BuildPart() as f2e:
    # F0 (on Top) → F2, piece 5 (new body, symmetric)
    with BuildSketch(Plane.XY):
        with Locations((-45.8346098157, 54.6235609131)):
            Circle(F0_R)
    extrude(amount=F2_DEPTH, both=True, taper=F2_TAPER)

    # F3#4
    f3_4_edges = [f2e.edges().sort_by_distance(p)[0] for p in [
        (-50.834034, 54.623561, 49.895265),
    ]]
    fillet(f3_4_edges, radius=F3_4_R)


with BuildPart() as f2f:
    # F0 (on Top) → F2, piece 6 (new body, symmetric)
    with BuildSketch(Plane.XY):
        with Locations((45.8346098157, 54.6235609131)):
            Circle(F0_R)
    extrude(amount=F2_DEPTH, both=True, taper=F2_TAPER)

    # F3#5
    f3_5_edges = [f2f.edges().sort_by_distance(p)[0] for p in [
        (40.835186, 54.623561, 49.895265),
    ]]
    fillet(f3_5_edges, radius=F3_5_R)


with BuildPart() as f2g:
    # F0 (on Top) → F2, piece 7 (new body, symmetric)
    with BuildSketch(Plane.XY):
        with Locations((70.2226963037, 12.3821560164)):
            Circle(F0_R)
    extrude(amount=F2_DEPTH, both=True, taper=F2_TAPER)

    # F3#6
    f3_6_edges = [f2g.edges().sort_by_distance(p)[0] for p in [
        (65.223272, 12.382156, 49.895265),
    ]]
    fillet(f3_6_edges, radius=F3_6_R)


with BuildPart() as f2h:
    # F0 (on Top) → F2, piece 8 (new body, symmetric)
    with BuildSketch(Plane.XY):
        with Locations((61.7528027529, -35.6529972926)):
            Circle(F0_R)
    extrude(amount=F2_DEPTH, both=True, taper=F2_TAPER)

    # F3#7
    f3_7_edges = [f2h.edges().sort_by_distance(p)[0] for p in [
        (56.753378, -35.652997, 49.895265),
    ]]
    fillet(f3_7_edges, radius=F3_7_R)


with BuildPart() as f2i:
    # F0 (on Top) → F2, piece 9 (new body, symmetric)
    with BuildSketch(Plane.XY):
        with Locations((117.0822919246, -20.6447670295)):
            Circle(F0_R)
    extrude(amount=F2_DEPTH, both=True, taper=F2_TAPER)

    # F3#8
    f3_8_edges = [f2i.edges().sort_by_distance(p)[0] for p in [
        (112.082868, -20.644767, 49.895265),
    ]]
    fillet(f3_8_edges, radius=F3_8_R)


with BuildPart() as f2j:
    # F0 (on Top) → F2, piece 10 (new body, symmetric)
    with BuildSketch(Plane.XY):
        with Locations((117.0822919246, 20.6447670295)):
            Circle(F0_R)
    extrude(amount=F2_DEPTH, both=True, taper=F2_TAPER)

    # F3#9
    f3_9_edges = [f2j.edges().sort_by_distance(p)[0] for p in [
        (112.082868, 20.644767, 49.895265),
    ]]
    fillet(f3_9_edges, radius=F3_9_R)


solid = Compound([f1.part, f2.part, f2b.part, f2c.part, f2d.part, f2e.part, f2f.part, f2g.part, f2h.part, f2i.part, f2j.part])
